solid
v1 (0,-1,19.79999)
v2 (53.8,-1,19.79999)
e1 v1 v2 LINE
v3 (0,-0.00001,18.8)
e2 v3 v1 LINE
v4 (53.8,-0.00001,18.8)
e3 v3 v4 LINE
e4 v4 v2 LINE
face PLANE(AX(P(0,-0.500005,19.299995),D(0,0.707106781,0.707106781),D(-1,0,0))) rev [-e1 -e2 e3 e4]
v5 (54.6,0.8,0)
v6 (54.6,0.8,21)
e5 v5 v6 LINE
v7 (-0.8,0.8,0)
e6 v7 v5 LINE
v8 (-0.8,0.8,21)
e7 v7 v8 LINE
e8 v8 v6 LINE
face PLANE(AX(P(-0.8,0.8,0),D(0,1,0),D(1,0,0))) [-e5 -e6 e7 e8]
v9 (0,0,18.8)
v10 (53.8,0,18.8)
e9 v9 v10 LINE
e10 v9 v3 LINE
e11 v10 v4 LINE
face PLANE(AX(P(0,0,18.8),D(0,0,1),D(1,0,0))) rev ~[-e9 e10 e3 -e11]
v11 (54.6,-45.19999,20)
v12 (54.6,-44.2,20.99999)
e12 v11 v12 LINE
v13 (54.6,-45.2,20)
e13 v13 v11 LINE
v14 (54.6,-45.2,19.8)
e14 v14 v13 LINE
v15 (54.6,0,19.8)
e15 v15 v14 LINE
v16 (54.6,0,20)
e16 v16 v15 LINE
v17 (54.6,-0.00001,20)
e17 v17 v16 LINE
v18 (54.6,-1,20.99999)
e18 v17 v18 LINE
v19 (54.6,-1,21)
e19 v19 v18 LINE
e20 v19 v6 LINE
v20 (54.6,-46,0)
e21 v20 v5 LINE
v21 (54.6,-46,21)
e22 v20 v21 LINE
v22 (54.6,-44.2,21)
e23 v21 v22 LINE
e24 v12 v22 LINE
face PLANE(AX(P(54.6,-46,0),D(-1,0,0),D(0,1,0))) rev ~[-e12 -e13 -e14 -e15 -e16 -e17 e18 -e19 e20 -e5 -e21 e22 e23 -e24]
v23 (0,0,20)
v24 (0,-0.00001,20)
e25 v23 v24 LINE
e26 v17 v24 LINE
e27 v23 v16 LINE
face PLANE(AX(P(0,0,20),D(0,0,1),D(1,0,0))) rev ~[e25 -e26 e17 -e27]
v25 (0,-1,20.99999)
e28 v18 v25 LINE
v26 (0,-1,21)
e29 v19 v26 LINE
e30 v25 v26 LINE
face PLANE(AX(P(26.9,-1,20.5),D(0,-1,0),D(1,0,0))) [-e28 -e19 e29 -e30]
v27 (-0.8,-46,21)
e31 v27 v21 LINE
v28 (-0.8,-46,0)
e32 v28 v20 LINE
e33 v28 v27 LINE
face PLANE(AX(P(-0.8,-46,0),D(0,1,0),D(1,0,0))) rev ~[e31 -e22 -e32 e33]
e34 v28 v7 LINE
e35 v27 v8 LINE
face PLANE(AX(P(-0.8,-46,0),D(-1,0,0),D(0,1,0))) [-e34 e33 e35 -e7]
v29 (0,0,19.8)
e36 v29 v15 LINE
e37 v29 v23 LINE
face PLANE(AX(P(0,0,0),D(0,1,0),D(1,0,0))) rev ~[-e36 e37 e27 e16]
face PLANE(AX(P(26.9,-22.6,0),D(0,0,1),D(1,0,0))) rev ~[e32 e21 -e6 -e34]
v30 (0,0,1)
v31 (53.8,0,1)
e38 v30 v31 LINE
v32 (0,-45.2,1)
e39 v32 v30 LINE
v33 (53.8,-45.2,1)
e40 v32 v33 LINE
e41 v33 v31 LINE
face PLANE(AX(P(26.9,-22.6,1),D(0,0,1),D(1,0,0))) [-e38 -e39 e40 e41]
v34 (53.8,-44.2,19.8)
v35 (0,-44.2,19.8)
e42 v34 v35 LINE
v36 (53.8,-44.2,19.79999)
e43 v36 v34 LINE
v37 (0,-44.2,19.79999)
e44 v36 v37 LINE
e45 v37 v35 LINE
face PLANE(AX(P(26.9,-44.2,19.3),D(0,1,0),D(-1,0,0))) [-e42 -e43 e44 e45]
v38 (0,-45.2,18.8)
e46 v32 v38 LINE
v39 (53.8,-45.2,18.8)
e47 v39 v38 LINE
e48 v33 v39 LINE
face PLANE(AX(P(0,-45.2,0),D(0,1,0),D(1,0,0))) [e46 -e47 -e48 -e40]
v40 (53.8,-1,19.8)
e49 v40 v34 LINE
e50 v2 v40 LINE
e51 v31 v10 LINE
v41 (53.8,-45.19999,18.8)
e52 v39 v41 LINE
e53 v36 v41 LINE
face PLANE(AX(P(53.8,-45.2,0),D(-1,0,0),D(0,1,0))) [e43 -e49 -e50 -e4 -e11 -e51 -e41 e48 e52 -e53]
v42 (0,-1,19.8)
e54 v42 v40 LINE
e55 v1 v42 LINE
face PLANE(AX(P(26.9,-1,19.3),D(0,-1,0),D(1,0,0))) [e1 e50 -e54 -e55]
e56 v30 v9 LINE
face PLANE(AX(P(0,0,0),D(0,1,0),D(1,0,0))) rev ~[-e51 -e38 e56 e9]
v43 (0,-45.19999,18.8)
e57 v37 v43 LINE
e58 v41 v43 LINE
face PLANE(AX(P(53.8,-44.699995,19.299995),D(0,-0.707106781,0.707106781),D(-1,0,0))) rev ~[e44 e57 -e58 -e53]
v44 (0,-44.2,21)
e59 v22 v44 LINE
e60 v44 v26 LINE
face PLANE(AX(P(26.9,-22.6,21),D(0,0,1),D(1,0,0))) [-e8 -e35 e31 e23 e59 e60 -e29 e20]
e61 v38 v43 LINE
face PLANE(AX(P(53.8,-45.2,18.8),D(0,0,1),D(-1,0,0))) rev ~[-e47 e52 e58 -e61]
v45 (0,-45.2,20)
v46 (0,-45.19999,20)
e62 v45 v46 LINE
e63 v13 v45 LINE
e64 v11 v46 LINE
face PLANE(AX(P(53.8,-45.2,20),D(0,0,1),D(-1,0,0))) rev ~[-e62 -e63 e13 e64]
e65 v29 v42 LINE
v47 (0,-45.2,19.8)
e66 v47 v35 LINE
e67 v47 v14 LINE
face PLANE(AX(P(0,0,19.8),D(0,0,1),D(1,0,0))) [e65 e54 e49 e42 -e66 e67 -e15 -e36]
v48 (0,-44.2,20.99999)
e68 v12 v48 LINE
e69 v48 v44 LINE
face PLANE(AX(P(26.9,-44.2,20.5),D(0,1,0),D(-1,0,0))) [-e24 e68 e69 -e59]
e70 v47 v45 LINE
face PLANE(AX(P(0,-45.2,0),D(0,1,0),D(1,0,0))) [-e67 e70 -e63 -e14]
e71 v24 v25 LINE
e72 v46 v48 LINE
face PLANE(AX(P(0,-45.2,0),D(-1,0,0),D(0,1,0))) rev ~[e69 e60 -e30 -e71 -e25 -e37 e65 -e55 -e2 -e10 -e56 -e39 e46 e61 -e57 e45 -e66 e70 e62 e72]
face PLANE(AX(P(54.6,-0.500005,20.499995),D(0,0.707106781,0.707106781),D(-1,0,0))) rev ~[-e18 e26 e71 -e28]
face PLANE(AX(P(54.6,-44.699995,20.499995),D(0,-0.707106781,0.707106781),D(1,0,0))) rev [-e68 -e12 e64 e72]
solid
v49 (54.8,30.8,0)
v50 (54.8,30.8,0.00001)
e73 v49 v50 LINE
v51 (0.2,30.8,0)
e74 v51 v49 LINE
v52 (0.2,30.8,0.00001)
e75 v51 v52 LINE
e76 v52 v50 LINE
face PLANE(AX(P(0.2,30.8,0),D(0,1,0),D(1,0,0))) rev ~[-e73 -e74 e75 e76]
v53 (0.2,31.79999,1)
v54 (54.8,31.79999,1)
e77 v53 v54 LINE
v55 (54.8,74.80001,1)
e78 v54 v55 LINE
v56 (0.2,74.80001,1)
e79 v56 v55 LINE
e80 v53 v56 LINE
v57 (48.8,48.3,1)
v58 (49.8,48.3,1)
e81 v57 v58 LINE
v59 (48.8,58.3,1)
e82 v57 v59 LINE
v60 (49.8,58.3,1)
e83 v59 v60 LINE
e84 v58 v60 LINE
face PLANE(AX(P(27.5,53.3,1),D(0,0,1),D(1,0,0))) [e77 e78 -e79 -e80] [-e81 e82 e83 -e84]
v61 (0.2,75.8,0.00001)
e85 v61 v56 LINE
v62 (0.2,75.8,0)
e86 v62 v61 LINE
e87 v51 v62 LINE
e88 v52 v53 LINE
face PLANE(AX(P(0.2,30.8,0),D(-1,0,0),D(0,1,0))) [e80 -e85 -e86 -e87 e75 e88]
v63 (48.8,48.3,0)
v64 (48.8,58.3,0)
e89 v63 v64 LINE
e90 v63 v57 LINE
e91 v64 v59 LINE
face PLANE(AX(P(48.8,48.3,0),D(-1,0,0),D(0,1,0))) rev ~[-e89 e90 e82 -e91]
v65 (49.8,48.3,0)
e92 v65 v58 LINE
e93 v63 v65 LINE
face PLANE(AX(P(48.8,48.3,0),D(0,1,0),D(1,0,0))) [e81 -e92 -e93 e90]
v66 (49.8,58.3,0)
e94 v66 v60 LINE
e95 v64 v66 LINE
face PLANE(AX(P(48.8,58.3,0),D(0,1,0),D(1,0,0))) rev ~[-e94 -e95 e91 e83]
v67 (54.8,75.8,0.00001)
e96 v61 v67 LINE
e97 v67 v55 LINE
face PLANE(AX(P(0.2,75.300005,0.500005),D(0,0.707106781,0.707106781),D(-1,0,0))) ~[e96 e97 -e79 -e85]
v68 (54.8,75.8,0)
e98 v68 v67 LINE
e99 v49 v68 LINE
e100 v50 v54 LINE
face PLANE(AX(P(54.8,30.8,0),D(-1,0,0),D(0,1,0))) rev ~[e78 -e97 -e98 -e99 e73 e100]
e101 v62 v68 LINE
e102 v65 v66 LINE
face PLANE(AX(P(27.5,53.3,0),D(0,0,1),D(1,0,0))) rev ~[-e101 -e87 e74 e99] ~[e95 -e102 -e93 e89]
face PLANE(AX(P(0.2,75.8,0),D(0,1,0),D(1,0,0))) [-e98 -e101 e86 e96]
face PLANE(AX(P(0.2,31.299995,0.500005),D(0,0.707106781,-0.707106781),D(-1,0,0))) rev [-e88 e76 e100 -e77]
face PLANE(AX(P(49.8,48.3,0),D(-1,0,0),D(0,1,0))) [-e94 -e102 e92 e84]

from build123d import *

# Parameters (mm, degrees)
F0_W       = 55.4
F0_H       = 46.8
F0_W_2     = 53.8
F0_H_2     = 45.2
F1_DEPTH   = 21
F2_DEPTH   = 1
F3_W       = 53.8
F3_H       = 1
F5_DEPTH   = 1
F4_W       = 53.8
F4_H       = 1
F6_DEPTH   = 1
F9_DEPTH   = 0.8
F0_W_3     = 54.6
F0_H_3     = 45
F0_W_4     = 1
F0_H_4     = 10
F10_DEPTH  = 1
F11_SIZE   = 0.99999
F11_2_SIZE = 0.99999


# Not quite as in the source:
# - a fillet or chamfer is up to 0.001 mm smaller than in the source, because OpenCascade refuses the exact size
# - a feature of the source that left no trace in its solid (it failed there, or was rolled back) is left out
# - a feature names something its author has since deleted; it is built from what else it names


with BuildPart() as f1:
    # F0 (on Top) → F1 (new body)
    with BuildSketch(Plane.XY):
        with Locations((26.9, -22.6)):
            Rectangle(F0_W, F0_H)
        with Locations((26.9, -22.6)):
            Rectangle(F0_W_2, F0_H_2, mode=Mode.SUBTRACT)
    extrude(amount=F1_DEPTH)

    # F0 (on Top) → F2 (join)
    with BuildSketch(Plane.XY):
        with Locations((26.9, -22.6)):
            Rectangle(F0_W_2, F0_H_2)
    extrude(amount=F2_DEPTH)

    # F3 (on face) → F5 (join)
    with BuildSketch(Plane(origin=(0, -45.2, 0), x_dir=(-1, 0, 0), z_dir=(0, 1, 0))):
        with Locations((-26.9, 20.5)):
            Rectangle(F3_W, F3_H)
        with Locations((-26.9, 19.3)):
            Rectangle(F3_W, F3_H)
    extrude(amount=F5_DEPTH)

    # F4 (on face) → F6 (join)
    with BuildSketch(Plane.XZ):
        with Locations((26.9, 19.3)):
            Rectangle(F4_W, F4_H)
        with Locations((26.9, 20.5)):
            Rectangle(F4_W, F4_H)
    extrude(amount=F6_DEPTH)

    # F8 (on face) → F9 (cut, through all)
    with BuildSketch(Plane(origin=(53.8, 0, 0), x_dir=(0, -1, 0), z_dir=(-1, 0, 0))):
        Polygon((0, 19.8), (1, 19.8), (44.2, 19.8), (45.2, 19.8), (45.2, 20), (44.2, 20), (44.2, 21), (1, 21), (1, 20), (0, 20), align=None)
    extrude(amount=-F9_DEPTH, mode=Mode.SUBTRACT)

    # F11#2 (size 1 in the source; OpenCascade refuses exactly that, so slightly less here)
    f11_2_edges = [f1.edges().sort_by_distance(p)[0] for p in [
        (27.3, -1, 20),
        (26.9, -1, 18.8),
        (26.9, -44.2, 18.8),
        (27.3, -44.2, 20),
    ]]
    chamfer(f11_2_edges, length=F11_2_SIZE)


with BuildPart() as f10:
    # F0 (on Top) → F10 (new body)
    with BuildSketch(Plane.XY):
        with Locations((27.5, 53.3)):
            Rectangle(F0_W_3, F0_H_3)
        with Locations((49.3, 53.3)):
            Rectangle(F0_W_4, F0_H_4, mode=Mode.SUBTRACT)
    extrude(amount=F10_DEPTH)

    # F11 (size 1 in the source; OpenCascade refuses exactly that, so slightly less here)
    f11_edges = [f10.edges().sort_by_distance(p)[0] for p in [
        (27.5, 30.8, 1),
        (27.5, 75.8, 1),
    ]]
    chamfer(f11_edges, length=F11_SIZE)


solid = Compound([f1.part, f10.part])
